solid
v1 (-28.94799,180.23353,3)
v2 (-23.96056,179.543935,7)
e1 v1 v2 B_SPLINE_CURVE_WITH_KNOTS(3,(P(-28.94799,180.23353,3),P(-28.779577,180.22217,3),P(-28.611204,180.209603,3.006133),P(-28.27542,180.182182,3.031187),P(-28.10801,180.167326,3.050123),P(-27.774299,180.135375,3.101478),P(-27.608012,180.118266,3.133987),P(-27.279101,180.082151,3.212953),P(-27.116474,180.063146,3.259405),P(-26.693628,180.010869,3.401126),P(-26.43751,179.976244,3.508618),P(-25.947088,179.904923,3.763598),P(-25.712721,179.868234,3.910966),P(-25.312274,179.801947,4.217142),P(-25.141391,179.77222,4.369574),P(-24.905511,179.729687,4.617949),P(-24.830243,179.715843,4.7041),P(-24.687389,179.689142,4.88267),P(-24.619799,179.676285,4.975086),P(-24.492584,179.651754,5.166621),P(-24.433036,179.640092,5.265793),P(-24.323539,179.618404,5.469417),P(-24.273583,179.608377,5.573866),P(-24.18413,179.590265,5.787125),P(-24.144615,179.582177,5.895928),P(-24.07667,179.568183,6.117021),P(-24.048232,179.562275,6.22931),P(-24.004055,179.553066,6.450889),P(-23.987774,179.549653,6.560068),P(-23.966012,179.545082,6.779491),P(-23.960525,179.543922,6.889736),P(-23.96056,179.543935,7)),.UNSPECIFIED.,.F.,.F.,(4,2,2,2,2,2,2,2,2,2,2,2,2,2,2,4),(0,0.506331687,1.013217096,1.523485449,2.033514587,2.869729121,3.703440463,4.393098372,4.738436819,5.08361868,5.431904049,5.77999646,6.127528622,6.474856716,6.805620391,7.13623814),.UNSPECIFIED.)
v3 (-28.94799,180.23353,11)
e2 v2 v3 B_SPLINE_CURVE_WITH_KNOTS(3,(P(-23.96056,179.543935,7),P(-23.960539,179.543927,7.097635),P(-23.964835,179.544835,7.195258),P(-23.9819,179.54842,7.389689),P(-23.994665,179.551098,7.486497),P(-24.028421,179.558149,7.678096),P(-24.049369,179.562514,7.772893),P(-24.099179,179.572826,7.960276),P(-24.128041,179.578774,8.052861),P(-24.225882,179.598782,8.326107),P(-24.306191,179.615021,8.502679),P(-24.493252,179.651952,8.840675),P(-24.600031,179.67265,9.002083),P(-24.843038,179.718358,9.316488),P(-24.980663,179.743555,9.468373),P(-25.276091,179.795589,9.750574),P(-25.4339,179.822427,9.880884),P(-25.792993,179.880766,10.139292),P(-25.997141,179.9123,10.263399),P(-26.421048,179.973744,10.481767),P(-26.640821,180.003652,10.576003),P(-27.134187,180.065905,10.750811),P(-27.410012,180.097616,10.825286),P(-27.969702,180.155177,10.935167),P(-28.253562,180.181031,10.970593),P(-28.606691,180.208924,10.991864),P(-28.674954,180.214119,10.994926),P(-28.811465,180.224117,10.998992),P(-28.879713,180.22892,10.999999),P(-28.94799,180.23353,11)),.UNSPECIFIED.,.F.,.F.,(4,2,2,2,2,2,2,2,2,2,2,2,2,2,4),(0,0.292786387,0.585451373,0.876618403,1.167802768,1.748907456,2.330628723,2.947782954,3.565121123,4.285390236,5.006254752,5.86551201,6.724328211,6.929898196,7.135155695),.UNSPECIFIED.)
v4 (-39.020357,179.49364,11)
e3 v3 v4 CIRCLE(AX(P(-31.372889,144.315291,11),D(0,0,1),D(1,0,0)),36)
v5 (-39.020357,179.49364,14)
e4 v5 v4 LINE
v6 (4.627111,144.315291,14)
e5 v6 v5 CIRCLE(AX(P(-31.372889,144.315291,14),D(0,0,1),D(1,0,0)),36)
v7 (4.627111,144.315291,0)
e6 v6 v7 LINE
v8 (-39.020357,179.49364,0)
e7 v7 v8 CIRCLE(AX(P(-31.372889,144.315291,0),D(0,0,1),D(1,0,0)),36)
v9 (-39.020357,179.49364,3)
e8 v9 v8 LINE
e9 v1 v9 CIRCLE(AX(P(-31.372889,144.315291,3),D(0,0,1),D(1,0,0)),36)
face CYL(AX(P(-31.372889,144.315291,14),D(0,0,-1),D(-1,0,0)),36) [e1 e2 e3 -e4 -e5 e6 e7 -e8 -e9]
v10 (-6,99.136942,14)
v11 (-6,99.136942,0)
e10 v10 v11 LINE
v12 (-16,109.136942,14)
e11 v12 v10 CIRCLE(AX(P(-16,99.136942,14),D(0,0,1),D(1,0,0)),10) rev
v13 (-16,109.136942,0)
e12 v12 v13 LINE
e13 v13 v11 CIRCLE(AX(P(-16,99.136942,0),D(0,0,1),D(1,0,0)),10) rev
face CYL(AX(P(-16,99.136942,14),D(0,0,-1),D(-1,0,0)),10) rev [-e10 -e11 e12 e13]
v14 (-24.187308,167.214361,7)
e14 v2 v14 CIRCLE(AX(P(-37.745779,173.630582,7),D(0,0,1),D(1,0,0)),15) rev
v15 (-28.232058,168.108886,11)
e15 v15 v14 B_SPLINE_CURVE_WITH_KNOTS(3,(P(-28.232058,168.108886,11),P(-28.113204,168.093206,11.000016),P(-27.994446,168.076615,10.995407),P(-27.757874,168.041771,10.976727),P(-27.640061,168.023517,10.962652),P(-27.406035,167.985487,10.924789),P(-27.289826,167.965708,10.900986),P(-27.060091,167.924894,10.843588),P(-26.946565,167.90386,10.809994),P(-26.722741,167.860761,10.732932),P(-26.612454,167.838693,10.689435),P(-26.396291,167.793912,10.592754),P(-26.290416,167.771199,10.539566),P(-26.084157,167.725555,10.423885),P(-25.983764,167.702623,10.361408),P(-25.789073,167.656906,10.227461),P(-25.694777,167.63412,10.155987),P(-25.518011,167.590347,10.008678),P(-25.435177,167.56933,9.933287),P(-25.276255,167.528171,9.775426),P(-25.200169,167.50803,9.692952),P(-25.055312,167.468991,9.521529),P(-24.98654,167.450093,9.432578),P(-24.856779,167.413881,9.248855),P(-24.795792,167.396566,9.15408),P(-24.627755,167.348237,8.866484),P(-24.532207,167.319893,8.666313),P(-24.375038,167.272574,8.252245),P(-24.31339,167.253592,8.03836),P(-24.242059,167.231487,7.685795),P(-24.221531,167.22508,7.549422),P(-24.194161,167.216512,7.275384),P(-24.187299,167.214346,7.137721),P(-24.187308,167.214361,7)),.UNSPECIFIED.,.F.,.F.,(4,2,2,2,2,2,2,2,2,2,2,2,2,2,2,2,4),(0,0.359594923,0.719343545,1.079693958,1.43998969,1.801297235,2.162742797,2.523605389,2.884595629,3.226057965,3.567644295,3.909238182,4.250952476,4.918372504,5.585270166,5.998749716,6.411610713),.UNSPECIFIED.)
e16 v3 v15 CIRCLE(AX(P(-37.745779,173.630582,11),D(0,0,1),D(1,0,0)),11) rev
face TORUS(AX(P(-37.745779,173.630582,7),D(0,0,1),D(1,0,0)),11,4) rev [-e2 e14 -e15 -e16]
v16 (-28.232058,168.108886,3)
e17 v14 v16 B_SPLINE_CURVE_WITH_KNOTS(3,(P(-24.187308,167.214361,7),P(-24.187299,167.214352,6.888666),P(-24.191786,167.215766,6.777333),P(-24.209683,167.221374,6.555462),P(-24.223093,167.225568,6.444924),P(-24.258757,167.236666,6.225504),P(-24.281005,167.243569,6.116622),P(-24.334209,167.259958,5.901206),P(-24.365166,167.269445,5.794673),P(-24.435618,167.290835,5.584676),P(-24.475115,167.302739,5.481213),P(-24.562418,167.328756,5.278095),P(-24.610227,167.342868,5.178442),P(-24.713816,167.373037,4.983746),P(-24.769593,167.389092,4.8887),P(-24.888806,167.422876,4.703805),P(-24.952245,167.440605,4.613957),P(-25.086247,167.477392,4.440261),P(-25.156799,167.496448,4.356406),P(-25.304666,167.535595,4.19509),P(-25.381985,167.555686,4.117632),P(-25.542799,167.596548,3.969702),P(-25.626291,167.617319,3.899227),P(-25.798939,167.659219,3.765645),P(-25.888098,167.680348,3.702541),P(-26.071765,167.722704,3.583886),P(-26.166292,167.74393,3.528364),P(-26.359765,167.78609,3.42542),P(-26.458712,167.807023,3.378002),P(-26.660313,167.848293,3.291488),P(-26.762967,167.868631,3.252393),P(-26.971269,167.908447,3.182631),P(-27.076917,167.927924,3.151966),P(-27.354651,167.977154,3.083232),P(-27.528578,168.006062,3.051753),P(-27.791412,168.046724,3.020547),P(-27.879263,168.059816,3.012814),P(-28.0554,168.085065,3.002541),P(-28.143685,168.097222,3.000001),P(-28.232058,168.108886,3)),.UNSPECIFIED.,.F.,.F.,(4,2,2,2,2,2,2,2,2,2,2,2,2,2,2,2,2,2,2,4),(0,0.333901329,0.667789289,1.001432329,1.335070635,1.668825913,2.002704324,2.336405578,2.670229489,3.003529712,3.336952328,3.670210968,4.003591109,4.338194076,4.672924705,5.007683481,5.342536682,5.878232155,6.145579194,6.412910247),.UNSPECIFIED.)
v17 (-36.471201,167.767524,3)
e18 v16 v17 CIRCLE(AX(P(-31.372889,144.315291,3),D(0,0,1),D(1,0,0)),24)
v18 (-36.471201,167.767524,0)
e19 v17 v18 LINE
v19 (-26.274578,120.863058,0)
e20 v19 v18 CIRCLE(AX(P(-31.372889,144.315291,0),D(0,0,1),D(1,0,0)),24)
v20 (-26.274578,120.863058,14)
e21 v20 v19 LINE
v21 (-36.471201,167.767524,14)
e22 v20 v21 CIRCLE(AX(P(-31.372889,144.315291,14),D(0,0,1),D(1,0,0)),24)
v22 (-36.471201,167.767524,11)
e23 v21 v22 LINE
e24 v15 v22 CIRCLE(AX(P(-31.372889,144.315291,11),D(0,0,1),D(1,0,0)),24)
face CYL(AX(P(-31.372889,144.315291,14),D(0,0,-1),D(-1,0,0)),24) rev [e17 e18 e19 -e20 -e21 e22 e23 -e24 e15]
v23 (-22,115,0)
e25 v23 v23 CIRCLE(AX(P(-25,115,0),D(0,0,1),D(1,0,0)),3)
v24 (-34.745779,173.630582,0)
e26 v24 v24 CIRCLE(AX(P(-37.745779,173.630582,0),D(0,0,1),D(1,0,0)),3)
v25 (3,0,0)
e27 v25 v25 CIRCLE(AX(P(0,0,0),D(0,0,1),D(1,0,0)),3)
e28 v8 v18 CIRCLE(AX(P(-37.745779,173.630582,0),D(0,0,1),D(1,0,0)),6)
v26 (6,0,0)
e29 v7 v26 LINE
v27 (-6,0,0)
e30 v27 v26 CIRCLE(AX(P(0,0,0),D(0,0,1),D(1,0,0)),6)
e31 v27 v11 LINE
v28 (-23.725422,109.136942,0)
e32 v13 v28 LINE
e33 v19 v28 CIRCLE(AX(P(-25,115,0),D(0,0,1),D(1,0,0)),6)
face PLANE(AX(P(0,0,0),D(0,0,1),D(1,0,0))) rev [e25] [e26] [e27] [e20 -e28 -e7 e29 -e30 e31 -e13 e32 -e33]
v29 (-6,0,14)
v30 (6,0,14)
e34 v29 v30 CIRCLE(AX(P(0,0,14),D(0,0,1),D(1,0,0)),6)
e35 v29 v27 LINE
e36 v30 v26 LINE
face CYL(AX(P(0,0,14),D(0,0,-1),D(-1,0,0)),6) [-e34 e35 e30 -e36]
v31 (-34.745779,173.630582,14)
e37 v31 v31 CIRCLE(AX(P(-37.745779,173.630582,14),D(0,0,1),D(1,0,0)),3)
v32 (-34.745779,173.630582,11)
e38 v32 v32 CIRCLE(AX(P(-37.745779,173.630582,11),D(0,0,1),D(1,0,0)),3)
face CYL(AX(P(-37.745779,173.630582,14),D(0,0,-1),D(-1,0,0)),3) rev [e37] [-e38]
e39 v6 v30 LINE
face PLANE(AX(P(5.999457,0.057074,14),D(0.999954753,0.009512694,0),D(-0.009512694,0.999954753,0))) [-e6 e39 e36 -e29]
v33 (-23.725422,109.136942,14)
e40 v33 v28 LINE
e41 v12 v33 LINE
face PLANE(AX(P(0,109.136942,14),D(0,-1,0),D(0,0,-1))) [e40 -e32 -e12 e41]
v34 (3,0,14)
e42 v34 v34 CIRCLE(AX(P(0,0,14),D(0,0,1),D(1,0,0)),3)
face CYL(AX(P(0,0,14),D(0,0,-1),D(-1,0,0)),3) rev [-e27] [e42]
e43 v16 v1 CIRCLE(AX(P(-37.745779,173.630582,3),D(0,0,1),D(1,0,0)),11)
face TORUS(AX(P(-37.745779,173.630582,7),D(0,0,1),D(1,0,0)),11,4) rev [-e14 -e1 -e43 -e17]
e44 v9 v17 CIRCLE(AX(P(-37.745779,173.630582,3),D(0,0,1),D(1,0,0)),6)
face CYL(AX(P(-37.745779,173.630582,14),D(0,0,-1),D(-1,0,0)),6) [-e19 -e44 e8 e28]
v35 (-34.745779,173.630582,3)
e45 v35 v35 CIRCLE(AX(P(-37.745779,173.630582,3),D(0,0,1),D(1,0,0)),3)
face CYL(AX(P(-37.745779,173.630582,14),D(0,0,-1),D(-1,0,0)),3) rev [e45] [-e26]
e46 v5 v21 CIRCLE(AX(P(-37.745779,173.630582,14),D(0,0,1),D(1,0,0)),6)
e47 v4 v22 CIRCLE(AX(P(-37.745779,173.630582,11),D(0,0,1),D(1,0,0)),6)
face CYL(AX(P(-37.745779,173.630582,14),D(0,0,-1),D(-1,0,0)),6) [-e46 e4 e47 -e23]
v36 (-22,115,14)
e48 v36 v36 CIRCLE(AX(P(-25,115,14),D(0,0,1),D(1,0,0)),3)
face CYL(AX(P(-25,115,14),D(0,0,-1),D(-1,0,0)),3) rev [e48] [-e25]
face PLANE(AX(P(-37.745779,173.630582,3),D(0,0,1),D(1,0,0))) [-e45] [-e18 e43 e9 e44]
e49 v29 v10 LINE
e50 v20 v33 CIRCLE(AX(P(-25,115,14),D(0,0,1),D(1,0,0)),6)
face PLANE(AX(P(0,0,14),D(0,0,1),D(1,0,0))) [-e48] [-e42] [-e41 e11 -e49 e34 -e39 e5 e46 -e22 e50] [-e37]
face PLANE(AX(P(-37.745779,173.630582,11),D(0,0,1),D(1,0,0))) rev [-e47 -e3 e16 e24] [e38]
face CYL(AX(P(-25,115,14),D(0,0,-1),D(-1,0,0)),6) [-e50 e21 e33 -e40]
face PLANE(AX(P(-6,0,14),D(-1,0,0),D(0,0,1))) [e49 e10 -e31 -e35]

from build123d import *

# Parameters (mm, degrees)
CROQUIS1_R              = 6
CROQUIS1_R_2            = 3
SALIENTE_EXTRUIR1_DEPTH = 14
CORTAR_EXTRUIR1_START   = -3
CROQUIS3_R              = 15
CORTAR_EXTRUIR1_DEPTH   = 8
REDONDEO1_R             = 4


with BuildPart() as part:
    # Croquis1 → Saliente-Extruir1 (new body)
    # profile 1 of 5: a face of its own
    with BuildSketch(Plane.XY):
        with BuildLine():
            ThreePointArc((-23.725422134, 109.136941816), (-3.343361872, 121.724461131), (4.62711067, 144.315290918))
            ThreePointArc((4.62711067, 144.315290918), (-8.782059543, 172.344818376), (-39.020356526, 179.493640019))
            ThreePointArc((-39.020356526, 179.493640019), (-33.980640362, 178.302169745), (-31.74577866, 173.630581835))
            ThreePointArc((-31.74577866, 173.630581835), (-33.07419075, 169.865443538), (-36.471200794, 167.767523652))
            ThreePointArc((-36.471200794, 167.767523652), (-7.920656596, 149.413602382), (-26.274577866, 120.863058184))
            ThreePointArc((-26.274577866, 120.863058184), (-21.234861702, 119.67158791), (-19, 115))
            ThreePointArc((-19, 115), (-20.32841209, 111.234861702), (-23.725422134, 109.136941816))
        make_face()
    # profile 2 of 5: a face of its own
    with BuildSketch(Plane.XY):
        with Locations((-37.74577866, 173.630581835)):
            Circle(CROQUIS1_R)
        with Locations((-37.74577866, 173.630581835)):
            Circle(CROQUIS1_R_2, mode=Mode.SUBTRACT)
    # profile 3 of 5: a face of its own
    with BuildSketch(Plane.XY):
        with Locations((-25, 115)):
            Circle(CROQUIS1_R)
        with Locations((-25, 115)):
            Circle(CROQUIS1_R_2, mode=Mode.SUBTRACT)
    # profile 4 of 5: a face of its own
    with BuildSketch(Plane.XY):
        with BuildLine():
            Line((5.998914104, 0.114147164), (4.62711067, 144.315290918))
            ThreePointArc((4.62711067, 144.315290918), (-3.343361872, 121.724461131), (-23.725422134, 109.136941816))
            Line((-23.725422134, 109.136941816), (-16, 109.136941816))
            ThreePointArc((-16, 109.136941816), (-8.928932188, 106.208009628), (-6, 99.136941816))
            Line((-6, 99.136941816), (-6, 0))
            ThreePointArc((-6, 0), (-0.057076164, 5.99972852), (5.998914104, 0.114147164))
        make_face()
    # profile 5 of 5: a face of its own
    with BuildSketch(Plane.XY):
        with BuildLine():
            Line((6, 0), (5.998914104, 0.114147164))
            ThreePointArc((5.998914104, 0.114147164), (-0.057076164, 5.99972852), (-6, 0))
            ThreePointArc((-6, 0), (0, -6), (6, 0))
        make_face()
        Circle(CROQUIS1_R_2, mode=Mode.SUBTRACT)
    extrude(amount=SALIENTE_EXTRUIR1_DEPTH)

    # Croquis3 → Cortar-Extruir1 (cut)
    with BuildSketch(Plane.XY.offset(14).offset(CORTAR_EXTRUIR1_START)):
        with Locations((-37.74577866, 173.630581835)):
            Circle(CROQUIS3_R)
    extrude(amount=-CORTAR_EXTRUIR1_DEPTH, mode=Mode.SUBTRACT)

    # Redondeo1
    redondeo1_edges = [part.edges().sort_by_distance(p)[0] for p in [
        (-22.748314626, 173.3547693, 11),
        (-22.748314626, 173.3547693, 3),
    ]]
    fillet(redondeo1_edges, radius=REDONDEO1_R - 0.0001)  # a hair under: the kernel refuses the full size


solid = part.part
